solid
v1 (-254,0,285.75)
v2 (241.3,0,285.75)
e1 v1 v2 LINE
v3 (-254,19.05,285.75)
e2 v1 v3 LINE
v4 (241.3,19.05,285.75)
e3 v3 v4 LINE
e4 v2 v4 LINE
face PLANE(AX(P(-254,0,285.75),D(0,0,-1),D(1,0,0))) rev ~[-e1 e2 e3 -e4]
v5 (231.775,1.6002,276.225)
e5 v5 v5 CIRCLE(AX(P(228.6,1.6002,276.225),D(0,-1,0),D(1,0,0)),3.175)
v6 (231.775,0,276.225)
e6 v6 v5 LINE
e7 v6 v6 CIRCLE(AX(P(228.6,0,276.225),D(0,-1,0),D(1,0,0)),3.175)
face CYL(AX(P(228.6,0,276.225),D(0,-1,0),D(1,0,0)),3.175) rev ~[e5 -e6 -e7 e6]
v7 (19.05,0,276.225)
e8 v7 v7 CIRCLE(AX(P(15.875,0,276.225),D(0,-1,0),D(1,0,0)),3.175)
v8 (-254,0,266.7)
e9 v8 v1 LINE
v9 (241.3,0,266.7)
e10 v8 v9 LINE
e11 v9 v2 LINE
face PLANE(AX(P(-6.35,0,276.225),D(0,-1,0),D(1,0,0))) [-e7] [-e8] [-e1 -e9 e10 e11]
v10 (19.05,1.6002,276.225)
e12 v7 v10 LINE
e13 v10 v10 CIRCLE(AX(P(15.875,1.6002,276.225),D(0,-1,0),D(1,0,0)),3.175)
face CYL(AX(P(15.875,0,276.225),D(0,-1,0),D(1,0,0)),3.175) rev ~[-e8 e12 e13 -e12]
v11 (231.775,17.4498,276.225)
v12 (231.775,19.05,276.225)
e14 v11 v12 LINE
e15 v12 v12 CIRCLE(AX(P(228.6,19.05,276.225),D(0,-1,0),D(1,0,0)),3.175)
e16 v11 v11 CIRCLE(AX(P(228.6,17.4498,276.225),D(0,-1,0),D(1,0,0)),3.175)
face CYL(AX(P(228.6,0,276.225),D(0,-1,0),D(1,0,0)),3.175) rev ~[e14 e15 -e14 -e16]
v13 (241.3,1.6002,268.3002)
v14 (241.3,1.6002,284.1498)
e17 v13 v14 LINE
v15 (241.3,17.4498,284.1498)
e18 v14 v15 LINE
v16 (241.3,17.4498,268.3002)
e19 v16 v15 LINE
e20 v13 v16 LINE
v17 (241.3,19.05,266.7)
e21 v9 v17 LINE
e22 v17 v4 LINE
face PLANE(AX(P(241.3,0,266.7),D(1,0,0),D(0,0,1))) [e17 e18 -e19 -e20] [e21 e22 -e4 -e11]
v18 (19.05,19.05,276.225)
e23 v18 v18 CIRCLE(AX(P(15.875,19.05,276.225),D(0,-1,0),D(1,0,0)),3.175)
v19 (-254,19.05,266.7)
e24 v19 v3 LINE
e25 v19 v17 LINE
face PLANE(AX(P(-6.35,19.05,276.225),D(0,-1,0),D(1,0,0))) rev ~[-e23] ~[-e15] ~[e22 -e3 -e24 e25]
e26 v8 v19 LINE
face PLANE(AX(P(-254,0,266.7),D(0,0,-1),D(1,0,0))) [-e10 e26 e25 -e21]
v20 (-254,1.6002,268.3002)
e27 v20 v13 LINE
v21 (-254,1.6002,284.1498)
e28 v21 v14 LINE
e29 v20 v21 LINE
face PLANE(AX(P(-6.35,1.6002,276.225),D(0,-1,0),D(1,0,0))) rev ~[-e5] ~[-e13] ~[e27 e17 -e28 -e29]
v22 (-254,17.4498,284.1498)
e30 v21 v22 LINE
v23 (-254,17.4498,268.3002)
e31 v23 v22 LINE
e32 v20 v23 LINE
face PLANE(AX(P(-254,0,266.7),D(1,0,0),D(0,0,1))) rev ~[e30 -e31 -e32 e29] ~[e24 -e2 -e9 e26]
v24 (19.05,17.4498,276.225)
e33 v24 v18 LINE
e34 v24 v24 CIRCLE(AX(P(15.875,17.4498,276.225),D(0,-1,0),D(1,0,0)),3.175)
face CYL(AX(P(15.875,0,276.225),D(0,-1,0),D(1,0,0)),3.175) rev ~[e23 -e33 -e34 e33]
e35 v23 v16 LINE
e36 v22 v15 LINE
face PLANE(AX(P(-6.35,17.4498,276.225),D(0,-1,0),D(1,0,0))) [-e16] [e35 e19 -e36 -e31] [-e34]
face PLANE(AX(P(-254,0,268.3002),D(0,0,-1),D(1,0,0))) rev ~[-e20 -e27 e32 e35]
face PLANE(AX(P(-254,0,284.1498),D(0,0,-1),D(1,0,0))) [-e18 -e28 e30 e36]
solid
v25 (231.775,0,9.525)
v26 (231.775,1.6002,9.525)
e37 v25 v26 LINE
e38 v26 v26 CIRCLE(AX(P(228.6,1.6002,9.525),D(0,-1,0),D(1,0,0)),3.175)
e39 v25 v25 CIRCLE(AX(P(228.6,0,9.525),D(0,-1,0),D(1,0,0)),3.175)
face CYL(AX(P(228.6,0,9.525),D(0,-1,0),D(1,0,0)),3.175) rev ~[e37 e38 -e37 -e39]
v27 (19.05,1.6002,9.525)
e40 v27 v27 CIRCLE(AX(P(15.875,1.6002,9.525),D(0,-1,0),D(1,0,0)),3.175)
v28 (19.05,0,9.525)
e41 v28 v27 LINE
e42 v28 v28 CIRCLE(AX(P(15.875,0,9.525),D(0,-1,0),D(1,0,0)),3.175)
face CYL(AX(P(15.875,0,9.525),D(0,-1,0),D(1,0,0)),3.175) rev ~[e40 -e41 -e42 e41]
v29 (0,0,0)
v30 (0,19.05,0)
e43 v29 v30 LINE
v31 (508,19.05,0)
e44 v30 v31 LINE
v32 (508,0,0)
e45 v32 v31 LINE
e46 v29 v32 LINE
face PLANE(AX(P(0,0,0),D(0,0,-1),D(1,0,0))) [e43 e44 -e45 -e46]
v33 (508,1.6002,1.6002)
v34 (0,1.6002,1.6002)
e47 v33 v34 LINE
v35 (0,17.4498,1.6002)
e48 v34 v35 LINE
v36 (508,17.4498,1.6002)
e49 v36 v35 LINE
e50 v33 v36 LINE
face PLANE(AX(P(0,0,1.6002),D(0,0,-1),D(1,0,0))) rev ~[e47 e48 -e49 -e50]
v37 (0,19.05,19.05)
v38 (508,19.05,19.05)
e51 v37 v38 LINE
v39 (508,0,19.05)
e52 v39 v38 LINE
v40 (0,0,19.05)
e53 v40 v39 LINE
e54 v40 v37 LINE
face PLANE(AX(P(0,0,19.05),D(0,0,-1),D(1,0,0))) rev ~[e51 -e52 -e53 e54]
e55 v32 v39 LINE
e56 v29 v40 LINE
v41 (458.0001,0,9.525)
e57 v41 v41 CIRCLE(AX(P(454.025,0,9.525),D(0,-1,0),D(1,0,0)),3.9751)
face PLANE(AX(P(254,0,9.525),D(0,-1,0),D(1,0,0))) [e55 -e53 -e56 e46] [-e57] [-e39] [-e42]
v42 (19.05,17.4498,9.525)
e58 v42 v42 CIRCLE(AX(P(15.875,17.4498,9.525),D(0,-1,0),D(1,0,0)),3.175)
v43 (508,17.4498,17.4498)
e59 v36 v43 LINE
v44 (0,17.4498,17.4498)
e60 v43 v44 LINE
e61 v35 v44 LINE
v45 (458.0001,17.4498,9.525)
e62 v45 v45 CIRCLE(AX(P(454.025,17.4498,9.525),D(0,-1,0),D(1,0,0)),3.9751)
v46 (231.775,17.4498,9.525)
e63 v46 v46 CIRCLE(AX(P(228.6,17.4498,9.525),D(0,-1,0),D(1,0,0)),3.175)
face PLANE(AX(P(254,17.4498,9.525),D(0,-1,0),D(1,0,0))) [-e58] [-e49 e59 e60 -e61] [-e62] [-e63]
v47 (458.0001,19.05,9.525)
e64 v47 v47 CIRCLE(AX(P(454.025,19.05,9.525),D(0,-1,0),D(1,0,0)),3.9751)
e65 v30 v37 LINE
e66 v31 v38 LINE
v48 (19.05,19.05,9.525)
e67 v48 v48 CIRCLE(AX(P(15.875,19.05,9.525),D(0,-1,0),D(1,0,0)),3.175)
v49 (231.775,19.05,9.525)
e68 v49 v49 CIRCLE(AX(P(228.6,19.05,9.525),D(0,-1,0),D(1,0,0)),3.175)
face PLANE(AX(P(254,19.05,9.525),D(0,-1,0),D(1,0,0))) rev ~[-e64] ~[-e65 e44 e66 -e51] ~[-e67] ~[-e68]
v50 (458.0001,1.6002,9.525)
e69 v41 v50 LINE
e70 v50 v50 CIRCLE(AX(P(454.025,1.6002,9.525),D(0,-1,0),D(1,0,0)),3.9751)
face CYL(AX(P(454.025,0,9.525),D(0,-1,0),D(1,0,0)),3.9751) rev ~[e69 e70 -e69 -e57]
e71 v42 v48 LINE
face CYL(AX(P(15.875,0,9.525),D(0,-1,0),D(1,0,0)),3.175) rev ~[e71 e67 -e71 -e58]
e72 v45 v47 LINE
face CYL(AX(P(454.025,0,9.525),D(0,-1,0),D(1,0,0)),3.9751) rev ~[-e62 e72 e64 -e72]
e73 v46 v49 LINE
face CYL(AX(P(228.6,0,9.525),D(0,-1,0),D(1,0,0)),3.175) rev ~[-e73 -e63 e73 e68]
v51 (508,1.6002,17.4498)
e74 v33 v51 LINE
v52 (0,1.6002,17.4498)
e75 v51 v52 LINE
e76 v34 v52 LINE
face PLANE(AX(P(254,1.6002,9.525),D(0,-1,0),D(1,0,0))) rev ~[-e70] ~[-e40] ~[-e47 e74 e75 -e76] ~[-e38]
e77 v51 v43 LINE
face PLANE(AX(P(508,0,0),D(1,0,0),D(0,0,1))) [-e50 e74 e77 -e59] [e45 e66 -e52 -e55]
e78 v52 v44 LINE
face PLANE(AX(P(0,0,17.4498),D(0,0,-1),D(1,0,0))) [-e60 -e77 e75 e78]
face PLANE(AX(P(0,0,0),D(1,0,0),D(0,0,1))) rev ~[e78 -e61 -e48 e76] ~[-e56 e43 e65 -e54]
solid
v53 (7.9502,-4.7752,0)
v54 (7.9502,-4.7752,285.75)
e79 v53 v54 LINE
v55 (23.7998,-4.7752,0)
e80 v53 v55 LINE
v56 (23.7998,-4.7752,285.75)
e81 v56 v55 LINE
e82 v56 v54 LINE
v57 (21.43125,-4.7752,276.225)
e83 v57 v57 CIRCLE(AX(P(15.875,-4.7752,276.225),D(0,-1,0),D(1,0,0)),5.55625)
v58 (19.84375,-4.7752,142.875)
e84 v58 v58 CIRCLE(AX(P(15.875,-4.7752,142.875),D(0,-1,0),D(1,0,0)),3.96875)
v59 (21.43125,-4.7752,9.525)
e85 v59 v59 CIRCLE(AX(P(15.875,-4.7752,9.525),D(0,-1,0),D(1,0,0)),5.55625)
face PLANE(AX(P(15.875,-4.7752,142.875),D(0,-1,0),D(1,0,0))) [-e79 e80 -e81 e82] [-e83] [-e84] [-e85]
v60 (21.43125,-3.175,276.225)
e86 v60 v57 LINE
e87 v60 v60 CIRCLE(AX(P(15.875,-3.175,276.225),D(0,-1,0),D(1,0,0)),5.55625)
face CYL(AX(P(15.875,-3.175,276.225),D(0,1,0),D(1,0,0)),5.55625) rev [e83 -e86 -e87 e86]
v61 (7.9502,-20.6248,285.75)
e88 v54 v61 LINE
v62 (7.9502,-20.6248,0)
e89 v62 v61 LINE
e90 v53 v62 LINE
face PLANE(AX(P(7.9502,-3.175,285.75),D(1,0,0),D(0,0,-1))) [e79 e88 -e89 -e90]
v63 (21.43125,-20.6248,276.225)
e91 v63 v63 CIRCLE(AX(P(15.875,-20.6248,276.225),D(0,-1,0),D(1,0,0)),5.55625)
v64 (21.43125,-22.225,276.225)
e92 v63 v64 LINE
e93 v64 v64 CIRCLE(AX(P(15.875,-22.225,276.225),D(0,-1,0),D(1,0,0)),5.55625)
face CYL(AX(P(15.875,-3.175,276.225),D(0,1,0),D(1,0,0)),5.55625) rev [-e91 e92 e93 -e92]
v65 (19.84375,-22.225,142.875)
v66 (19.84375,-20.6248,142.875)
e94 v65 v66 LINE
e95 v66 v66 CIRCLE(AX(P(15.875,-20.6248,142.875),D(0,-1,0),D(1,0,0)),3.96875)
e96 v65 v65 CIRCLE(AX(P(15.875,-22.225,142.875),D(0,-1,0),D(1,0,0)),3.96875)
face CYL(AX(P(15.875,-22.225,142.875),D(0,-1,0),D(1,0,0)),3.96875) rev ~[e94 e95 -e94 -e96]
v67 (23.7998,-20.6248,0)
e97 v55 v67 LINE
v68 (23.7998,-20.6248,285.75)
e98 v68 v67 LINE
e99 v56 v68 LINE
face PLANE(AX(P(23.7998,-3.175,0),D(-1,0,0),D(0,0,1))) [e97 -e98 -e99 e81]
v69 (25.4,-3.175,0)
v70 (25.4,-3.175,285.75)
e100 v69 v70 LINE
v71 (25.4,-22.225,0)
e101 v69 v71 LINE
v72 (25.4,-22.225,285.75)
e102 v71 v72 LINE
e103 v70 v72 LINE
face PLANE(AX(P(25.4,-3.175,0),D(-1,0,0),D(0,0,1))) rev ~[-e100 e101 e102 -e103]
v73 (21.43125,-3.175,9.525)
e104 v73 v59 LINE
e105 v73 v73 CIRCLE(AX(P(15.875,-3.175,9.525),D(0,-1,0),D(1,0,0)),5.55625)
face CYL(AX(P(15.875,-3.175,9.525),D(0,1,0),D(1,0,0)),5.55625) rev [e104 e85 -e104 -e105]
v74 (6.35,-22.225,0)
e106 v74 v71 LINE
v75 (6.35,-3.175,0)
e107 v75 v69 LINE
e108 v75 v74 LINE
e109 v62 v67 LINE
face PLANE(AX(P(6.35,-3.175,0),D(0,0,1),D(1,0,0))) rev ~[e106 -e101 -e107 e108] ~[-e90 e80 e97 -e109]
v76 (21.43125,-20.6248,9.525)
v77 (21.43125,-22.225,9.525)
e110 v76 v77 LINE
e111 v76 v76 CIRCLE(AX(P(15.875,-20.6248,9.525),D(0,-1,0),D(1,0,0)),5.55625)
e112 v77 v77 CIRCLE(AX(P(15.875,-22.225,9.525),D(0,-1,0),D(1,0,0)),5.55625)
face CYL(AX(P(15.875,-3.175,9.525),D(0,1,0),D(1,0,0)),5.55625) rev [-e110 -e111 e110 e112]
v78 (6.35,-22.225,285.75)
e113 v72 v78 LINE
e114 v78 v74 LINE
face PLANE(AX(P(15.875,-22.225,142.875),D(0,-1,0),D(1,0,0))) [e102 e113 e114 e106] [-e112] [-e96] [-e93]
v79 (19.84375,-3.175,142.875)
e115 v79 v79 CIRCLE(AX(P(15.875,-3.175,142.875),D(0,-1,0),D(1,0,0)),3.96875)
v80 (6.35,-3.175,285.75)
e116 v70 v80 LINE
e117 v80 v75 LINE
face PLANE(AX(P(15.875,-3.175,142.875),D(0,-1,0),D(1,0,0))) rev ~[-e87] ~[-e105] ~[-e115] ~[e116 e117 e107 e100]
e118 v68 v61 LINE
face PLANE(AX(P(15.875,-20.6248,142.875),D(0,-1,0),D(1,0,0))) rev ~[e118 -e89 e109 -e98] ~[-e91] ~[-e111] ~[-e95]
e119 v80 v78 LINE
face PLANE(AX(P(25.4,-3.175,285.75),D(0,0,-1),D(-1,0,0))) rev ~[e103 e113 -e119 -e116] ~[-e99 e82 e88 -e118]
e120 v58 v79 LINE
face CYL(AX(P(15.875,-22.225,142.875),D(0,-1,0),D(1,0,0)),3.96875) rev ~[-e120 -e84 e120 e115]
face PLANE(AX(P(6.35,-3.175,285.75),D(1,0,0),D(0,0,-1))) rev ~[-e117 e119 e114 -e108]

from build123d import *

# Parameters (mm, degrees)
F0_W      = 508
F0_H      = 19.05
F1_DEPTH  = 19.05
F2_T      = -1.6002
F3_R      = 3.175
F4_DEPTH  = 19.051
F7_R      = 5.55625
F8_DEPTH  = 19.05
F9_T      = -1.6002
F10_W     = 495.3
F10_H     = 19.05
F10_R     = 3.175
F11_DEPTH = 19.05
F12_T     = -1.6002
F13_R     = 3.96875
F14_DEPTH = 25.4
F15_R     = 3.9751
F16_DEPTH = 19.051


# Not quite as in the source:
# - a feature names something its author has since deleted; it is built from what else it names


with BuildPart() as f1:
    # F0 (on Front) → F1 (new body)
    with BuildSketch(Plane.XZ):
        with Locations((254, 9.525)):
            Rectangle(F0_W, F0_H)
    extrude(amount=-F1_DEPTH)

    # F2
    f2_openings = [f1.faces().sort_by_distance(p)[0] for p in [
        (508, 9.525, 9.525),
        (0, 9.525, 9.525),
    ]]
    offset(amount=F2_T, openings=f2_openings)

    # F3 (on face) → F4 (cut, through all)
    with BuildSketch(Plane.XZ):
        with Locations((228.6, 9.525)):
            Circle(F3_R)
        with Locations((15.875, 9.525)):
            Circle(F3_R)
    extrude(amount=-F4_DEPTH, mode=Mode.SUBTRACT)

    # F15 (on face) → F16 (cut, through all)
    with BuildSketch(Plane.XZ):
        with Locations((454.025, 9.525)):
            Circle(F15_R)
    extrude(amount=-F16_DEPTH, mode=Mode.SUBTRACT)


with BuildPart() as f8:
    # F7 (on offset) → F8 (new body)
    with BuildSketch(Plane.XZ.offset(3.175)):
        Polygon((25.4, 285.75), (6.35, 285.75), (6.35, 276.225), (6.35, 0), (25.4, 0), (25.4, 276.225), align=None)
        with Locations((15.875, 9.525)):
            Circle(F7_R, mode=Mode.SUBTRACT)
        with Locations((15.875, 276.225)):
            Circle(F7_R, mode=Mode.SUBTRACT)
    extrude(amount=F8_DEPTH)

    # F9
    f9_openings = [f8.faces().sort_by_distance(p)[0] for p in [
        (10.31875, -12.7, 276.225),
        (15.875, -12.7, 0),
        (10.31875, -12.7, 9.525),
        (15.875, -12.7, 285.75),
    ]]
    offset(amount=F9_T, openings=f9_openings)

    # F13 (on face) → F14 (cut)
    with BuildSketch(Plane.XZ.offset(22.225)):
        with Locations((15.875, 142.875)):
            Circle(F13_R)
    extrude(amount=-F14_DEPTH, mode=Mode.SUBTRACT)


with BuildPart() as f11:
    # F10 (on Front) → F11 (new body)
    with BuildSketch(Plane.XZ):
        with Locations((-6.35, 276.225)):
            Rectangle(F10_W, F10_H)
        with Locations((15.875, 276.225)):
            Circle(F10_R, mode=Mode.SUBTRACT)
        with Locations((228.6, 276.225)):
            Circle(F10_R, mode=Mode.SUBTRACT)
    extrude(amount=-F11_DEPTH)

    # F12
    f12_openings = [f11.faces().sort_by_distance(p)[0] for p in [
        (-254, 9.525, 276.225),
        (12.7, 9.525, 276.225),
        (241.3, 9.525, 276.225),
        (225.425, 9.525, 276.225),
    ]]
    offset(amount=F12_T, openings=f12_openings)


solid = Compound([f1.part, f8.part, f11.part])
